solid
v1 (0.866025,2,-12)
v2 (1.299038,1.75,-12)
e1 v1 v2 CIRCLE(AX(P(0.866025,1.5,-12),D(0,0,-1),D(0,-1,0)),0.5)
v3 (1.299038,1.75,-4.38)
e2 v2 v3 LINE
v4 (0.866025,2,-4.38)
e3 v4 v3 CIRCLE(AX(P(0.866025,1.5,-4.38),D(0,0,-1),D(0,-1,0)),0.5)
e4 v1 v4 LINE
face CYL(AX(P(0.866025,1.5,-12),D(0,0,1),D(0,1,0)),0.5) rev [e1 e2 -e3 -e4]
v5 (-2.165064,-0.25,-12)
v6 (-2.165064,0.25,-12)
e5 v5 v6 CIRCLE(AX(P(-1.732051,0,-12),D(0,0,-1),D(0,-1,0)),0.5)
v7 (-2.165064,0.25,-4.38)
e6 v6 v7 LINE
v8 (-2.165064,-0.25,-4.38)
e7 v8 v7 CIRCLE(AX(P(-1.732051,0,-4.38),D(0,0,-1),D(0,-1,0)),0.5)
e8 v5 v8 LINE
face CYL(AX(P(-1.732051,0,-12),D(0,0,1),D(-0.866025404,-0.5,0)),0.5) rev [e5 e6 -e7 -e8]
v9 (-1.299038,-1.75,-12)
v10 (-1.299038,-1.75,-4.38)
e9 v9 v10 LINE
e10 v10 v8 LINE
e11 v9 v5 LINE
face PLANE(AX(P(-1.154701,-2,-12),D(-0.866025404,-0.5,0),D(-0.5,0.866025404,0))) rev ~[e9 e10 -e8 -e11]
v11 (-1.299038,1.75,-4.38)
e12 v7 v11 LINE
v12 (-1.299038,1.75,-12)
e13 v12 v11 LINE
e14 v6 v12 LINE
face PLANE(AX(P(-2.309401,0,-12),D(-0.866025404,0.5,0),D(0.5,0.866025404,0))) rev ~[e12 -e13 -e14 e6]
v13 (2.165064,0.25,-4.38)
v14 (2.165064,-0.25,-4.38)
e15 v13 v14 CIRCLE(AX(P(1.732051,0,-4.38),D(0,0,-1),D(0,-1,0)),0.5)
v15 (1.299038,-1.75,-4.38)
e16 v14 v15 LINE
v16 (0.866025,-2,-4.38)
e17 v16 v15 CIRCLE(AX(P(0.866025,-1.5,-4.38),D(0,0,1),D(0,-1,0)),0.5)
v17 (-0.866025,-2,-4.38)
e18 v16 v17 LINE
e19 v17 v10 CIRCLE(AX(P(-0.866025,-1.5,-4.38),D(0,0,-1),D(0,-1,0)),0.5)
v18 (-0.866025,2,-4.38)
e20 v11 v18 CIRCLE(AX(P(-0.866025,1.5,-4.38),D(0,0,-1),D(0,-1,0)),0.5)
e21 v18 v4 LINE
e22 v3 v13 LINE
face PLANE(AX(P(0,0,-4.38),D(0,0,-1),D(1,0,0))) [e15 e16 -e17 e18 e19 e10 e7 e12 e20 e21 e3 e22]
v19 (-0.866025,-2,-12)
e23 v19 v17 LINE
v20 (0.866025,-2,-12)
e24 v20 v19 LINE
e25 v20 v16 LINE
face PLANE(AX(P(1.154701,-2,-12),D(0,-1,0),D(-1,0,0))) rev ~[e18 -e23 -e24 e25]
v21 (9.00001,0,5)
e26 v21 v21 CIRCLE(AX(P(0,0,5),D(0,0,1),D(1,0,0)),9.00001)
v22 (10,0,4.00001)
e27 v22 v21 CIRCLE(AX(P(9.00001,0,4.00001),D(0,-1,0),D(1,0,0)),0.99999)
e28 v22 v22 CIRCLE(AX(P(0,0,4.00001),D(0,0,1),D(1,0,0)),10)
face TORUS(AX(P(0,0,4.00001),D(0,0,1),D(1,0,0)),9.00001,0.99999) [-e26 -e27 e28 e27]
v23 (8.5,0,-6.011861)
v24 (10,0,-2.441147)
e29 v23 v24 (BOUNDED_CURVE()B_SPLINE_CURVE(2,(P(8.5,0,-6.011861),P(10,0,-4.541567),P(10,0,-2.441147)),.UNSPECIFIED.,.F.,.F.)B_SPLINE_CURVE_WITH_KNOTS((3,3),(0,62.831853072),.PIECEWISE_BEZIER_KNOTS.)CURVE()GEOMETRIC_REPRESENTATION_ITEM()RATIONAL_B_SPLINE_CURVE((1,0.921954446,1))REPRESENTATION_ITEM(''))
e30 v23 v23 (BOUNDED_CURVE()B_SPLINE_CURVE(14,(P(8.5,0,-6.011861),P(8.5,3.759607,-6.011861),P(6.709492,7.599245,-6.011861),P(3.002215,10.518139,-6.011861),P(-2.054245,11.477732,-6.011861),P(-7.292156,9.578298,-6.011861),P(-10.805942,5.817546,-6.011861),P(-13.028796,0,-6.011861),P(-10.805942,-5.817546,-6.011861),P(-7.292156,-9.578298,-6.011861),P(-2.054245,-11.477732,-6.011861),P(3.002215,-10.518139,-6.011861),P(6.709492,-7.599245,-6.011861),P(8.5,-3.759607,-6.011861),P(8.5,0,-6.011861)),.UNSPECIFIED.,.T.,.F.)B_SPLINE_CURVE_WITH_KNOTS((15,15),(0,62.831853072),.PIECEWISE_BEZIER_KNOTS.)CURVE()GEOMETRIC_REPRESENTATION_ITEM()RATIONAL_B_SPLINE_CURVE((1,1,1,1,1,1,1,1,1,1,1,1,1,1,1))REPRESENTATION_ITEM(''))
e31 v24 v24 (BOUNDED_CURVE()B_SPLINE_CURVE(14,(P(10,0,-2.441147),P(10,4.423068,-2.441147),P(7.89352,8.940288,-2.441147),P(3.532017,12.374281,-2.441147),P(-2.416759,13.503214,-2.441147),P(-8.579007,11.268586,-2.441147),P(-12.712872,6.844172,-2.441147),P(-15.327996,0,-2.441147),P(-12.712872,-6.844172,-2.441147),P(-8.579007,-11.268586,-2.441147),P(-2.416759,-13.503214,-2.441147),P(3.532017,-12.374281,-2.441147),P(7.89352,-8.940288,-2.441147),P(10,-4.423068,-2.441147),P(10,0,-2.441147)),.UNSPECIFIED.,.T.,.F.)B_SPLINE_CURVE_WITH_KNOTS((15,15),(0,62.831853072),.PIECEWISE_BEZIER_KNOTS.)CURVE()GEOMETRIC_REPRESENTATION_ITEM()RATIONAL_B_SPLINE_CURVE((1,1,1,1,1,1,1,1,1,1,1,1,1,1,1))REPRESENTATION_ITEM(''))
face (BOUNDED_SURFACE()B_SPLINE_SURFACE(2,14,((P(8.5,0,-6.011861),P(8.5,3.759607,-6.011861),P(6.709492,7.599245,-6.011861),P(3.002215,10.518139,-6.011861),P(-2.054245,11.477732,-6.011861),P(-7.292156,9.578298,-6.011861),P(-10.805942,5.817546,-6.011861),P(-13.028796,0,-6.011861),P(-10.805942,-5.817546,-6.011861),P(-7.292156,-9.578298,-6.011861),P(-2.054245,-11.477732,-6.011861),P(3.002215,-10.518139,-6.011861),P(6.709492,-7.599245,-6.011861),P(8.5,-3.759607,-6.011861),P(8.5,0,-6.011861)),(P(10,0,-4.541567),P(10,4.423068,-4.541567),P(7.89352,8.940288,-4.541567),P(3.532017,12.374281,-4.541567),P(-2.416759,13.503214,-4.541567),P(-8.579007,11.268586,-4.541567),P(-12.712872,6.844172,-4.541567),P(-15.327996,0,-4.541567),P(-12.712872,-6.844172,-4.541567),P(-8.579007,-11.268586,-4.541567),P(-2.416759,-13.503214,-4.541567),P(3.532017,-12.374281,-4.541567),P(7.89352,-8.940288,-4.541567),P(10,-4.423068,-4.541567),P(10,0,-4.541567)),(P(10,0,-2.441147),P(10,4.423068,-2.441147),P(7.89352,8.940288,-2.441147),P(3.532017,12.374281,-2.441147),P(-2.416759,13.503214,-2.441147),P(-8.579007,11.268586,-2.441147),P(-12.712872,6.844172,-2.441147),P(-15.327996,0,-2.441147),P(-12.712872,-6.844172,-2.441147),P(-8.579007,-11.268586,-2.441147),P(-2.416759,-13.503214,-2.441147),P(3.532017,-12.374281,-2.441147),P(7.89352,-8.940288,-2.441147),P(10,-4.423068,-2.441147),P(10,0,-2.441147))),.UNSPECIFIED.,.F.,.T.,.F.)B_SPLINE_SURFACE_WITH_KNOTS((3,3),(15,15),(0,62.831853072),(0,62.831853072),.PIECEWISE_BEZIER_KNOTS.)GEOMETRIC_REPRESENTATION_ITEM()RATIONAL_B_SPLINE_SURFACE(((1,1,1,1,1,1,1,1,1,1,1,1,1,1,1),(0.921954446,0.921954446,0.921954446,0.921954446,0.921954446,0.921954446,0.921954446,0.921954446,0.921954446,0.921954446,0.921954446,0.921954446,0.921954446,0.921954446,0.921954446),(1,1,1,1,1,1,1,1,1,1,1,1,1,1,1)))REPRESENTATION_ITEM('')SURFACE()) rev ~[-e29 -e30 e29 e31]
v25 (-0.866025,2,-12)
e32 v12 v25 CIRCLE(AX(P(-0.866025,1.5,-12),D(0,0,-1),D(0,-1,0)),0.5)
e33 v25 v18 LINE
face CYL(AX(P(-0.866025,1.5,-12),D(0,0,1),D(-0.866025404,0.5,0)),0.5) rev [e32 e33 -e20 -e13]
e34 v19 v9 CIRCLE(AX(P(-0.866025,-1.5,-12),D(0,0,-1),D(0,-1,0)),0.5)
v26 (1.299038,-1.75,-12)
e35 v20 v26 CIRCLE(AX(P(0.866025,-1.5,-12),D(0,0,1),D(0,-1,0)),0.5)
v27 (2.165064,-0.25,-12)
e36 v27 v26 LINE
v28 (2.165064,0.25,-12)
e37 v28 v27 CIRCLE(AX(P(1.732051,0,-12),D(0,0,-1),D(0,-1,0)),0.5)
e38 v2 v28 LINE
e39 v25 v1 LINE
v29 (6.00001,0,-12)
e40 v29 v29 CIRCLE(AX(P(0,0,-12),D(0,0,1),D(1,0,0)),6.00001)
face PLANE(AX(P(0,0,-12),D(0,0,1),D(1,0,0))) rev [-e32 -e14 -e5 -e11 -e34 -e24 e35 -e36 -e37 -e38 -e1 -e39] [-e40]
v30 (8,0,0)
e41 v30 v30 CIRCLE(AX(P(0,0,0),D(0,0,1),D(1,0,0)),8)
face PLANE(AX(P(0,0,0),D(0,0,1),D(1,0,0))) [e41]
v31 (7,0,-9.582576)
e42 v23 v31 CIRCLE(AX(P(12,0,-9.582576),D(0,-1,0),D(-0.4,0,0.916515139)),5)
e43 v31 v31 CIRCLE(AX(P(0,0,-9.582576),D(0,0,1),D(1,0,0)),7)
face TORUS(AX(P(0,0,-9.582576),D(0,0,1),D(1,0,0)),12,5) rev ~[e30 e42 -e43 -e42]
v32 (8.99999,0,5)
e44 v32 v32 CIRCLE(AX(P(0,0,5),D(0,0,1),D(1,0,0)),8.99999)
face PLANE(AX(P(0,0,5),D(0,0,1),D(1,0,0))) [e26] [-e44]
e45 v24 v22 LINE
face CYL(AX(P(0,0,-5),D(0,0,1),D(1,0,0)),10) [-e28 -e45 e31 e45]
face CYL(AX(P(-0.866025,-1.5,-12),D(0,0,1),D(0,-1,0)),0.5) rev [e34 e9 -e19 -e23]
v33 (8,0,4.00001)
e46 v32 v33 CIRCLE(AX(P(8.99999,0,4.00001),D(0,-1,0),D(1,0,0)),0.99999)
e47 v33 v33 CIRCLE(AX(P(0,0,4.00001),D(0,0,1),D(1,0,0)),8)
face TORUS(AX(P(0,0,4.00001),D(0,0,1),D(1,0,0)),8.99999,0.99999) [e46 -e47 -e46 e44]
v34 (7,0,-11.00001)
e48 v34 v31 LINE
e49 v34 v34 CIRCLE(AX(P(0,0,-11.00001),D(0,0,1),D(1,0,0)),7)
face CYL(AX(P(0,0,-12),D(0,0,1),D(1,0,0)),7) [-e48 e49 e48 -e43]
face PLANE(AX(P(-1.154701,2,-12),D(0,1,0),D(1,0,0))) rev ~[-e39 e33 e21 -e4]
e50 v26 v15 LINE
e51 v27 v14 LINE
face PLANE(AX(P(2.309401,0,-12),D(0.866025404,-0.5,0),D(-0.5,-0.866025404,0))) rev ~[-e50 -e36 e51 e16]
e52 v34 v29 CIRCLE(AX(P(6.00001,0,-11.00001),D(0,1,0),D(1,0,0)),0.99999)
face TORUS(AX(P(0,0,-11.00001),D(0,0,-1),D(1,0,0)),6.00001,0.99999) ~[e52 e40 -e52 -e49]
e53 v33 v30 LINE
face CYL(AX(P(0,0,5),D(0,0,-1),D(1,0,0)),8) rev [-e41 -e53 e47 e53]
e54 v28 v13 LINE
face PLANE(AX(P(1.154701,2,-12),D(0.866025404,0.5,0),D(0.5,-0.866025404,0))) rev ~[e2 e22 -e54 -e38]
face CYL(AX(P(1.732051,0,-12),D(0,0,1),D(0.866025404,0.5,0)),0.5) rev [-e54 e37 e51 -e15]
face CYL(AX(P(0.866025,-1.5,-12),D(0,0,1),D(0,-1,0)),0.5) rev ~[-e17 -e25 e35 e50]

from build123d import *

# Parameters (mm, degrees)
F3_DEPTH = 7.62
F5_R     = 5
F6_R     = 0.99999
F7_R     = 0.5


# Not quite as in the source:
# - a fillet or chamfer that OpenCascade refuses, or shapes differently, is made with other operations: its cross-section is extruded or revolved along the edge and cut away or added
# - a fillet or chamfer is up to 0.001 mm smaller than in the source, because OpenCascade refuses the exact size


with BuildPart() as f1:
    # F0 (on Front) → F1 (revolve)
    with BuildSketch(Plane.XZ):
        Polygon((8, 5), (8, 0), (0, 0), (0, -12), (7, -12), (7, -5), (10, -5), (10, 5), align=None)
    revolve(axis=Axis((0, 0, -6), (0, 0, 1)))

    # F2 (on face) → F3 (cut)
    with BuildSketch(Plane(origin=(0, 0, -12), x_dir=(1, 0, 0), z_dir=(0, 0, -1))):
        Polygon((1.1547005384, 2), (-1.1547005384, 2), (-2.3094010768, 0), (-1.1547005384, -2), (1.1547005384, -2), (2.3094010768, 0), align=None)
    extrude(amount=-F3_DEPTH, mode=Mode.SUBTRACT)

    # F4: fillet of radius 5 on 1 edges, made by hand

    # F4_s1 → F4_t2 (revolve)
    with BuildSketch(Plane.XZ):
        with BuildLine():
            ThreePointArc((10, -5), (7.8166998673, -6.8439629074), (7, -9.582575695))
            Line((7, -9.582575695), (7, -5))
            Line((7, -5), (10, -5))
        make_face()
    revolve(axis=Axis((0, 0, -5), (0, 0, 1)))

    # F5
    f5_edges = [f1.edges().sort_by_distance(p)[0] for p in [
        (-10, 0, -5),
    ]]
    fillet(f5_edges, radius=F5_R)

    # F6 (radius 1 in the source; OpenCascade refuses exactly that, so slightly less here)
    f6_edges = [f1.edges().sort_by_distance(p)[0] for p in [
        (-10, 0, 5),
        (-8, 0, 5),
        (-7, 0, -12),
    ]]
    fillet(f6_edges, radius=F6_R)

    # F7
    f7_edges = [f1.edges().sort_by_distance(p)[0] for p in [
        (-2.309401, 0, -8.19),
        (-1.154701, -2, -8.19),
        (1.154701, -2, -8.19),
        (2.309401, 0, -8.19),
        (1.154701, 2, -8.19),
        (-1.154701, 2, -8.19),
    ]]
    fillet(f7_edges, radius=F7_R)


solid = f1.part
